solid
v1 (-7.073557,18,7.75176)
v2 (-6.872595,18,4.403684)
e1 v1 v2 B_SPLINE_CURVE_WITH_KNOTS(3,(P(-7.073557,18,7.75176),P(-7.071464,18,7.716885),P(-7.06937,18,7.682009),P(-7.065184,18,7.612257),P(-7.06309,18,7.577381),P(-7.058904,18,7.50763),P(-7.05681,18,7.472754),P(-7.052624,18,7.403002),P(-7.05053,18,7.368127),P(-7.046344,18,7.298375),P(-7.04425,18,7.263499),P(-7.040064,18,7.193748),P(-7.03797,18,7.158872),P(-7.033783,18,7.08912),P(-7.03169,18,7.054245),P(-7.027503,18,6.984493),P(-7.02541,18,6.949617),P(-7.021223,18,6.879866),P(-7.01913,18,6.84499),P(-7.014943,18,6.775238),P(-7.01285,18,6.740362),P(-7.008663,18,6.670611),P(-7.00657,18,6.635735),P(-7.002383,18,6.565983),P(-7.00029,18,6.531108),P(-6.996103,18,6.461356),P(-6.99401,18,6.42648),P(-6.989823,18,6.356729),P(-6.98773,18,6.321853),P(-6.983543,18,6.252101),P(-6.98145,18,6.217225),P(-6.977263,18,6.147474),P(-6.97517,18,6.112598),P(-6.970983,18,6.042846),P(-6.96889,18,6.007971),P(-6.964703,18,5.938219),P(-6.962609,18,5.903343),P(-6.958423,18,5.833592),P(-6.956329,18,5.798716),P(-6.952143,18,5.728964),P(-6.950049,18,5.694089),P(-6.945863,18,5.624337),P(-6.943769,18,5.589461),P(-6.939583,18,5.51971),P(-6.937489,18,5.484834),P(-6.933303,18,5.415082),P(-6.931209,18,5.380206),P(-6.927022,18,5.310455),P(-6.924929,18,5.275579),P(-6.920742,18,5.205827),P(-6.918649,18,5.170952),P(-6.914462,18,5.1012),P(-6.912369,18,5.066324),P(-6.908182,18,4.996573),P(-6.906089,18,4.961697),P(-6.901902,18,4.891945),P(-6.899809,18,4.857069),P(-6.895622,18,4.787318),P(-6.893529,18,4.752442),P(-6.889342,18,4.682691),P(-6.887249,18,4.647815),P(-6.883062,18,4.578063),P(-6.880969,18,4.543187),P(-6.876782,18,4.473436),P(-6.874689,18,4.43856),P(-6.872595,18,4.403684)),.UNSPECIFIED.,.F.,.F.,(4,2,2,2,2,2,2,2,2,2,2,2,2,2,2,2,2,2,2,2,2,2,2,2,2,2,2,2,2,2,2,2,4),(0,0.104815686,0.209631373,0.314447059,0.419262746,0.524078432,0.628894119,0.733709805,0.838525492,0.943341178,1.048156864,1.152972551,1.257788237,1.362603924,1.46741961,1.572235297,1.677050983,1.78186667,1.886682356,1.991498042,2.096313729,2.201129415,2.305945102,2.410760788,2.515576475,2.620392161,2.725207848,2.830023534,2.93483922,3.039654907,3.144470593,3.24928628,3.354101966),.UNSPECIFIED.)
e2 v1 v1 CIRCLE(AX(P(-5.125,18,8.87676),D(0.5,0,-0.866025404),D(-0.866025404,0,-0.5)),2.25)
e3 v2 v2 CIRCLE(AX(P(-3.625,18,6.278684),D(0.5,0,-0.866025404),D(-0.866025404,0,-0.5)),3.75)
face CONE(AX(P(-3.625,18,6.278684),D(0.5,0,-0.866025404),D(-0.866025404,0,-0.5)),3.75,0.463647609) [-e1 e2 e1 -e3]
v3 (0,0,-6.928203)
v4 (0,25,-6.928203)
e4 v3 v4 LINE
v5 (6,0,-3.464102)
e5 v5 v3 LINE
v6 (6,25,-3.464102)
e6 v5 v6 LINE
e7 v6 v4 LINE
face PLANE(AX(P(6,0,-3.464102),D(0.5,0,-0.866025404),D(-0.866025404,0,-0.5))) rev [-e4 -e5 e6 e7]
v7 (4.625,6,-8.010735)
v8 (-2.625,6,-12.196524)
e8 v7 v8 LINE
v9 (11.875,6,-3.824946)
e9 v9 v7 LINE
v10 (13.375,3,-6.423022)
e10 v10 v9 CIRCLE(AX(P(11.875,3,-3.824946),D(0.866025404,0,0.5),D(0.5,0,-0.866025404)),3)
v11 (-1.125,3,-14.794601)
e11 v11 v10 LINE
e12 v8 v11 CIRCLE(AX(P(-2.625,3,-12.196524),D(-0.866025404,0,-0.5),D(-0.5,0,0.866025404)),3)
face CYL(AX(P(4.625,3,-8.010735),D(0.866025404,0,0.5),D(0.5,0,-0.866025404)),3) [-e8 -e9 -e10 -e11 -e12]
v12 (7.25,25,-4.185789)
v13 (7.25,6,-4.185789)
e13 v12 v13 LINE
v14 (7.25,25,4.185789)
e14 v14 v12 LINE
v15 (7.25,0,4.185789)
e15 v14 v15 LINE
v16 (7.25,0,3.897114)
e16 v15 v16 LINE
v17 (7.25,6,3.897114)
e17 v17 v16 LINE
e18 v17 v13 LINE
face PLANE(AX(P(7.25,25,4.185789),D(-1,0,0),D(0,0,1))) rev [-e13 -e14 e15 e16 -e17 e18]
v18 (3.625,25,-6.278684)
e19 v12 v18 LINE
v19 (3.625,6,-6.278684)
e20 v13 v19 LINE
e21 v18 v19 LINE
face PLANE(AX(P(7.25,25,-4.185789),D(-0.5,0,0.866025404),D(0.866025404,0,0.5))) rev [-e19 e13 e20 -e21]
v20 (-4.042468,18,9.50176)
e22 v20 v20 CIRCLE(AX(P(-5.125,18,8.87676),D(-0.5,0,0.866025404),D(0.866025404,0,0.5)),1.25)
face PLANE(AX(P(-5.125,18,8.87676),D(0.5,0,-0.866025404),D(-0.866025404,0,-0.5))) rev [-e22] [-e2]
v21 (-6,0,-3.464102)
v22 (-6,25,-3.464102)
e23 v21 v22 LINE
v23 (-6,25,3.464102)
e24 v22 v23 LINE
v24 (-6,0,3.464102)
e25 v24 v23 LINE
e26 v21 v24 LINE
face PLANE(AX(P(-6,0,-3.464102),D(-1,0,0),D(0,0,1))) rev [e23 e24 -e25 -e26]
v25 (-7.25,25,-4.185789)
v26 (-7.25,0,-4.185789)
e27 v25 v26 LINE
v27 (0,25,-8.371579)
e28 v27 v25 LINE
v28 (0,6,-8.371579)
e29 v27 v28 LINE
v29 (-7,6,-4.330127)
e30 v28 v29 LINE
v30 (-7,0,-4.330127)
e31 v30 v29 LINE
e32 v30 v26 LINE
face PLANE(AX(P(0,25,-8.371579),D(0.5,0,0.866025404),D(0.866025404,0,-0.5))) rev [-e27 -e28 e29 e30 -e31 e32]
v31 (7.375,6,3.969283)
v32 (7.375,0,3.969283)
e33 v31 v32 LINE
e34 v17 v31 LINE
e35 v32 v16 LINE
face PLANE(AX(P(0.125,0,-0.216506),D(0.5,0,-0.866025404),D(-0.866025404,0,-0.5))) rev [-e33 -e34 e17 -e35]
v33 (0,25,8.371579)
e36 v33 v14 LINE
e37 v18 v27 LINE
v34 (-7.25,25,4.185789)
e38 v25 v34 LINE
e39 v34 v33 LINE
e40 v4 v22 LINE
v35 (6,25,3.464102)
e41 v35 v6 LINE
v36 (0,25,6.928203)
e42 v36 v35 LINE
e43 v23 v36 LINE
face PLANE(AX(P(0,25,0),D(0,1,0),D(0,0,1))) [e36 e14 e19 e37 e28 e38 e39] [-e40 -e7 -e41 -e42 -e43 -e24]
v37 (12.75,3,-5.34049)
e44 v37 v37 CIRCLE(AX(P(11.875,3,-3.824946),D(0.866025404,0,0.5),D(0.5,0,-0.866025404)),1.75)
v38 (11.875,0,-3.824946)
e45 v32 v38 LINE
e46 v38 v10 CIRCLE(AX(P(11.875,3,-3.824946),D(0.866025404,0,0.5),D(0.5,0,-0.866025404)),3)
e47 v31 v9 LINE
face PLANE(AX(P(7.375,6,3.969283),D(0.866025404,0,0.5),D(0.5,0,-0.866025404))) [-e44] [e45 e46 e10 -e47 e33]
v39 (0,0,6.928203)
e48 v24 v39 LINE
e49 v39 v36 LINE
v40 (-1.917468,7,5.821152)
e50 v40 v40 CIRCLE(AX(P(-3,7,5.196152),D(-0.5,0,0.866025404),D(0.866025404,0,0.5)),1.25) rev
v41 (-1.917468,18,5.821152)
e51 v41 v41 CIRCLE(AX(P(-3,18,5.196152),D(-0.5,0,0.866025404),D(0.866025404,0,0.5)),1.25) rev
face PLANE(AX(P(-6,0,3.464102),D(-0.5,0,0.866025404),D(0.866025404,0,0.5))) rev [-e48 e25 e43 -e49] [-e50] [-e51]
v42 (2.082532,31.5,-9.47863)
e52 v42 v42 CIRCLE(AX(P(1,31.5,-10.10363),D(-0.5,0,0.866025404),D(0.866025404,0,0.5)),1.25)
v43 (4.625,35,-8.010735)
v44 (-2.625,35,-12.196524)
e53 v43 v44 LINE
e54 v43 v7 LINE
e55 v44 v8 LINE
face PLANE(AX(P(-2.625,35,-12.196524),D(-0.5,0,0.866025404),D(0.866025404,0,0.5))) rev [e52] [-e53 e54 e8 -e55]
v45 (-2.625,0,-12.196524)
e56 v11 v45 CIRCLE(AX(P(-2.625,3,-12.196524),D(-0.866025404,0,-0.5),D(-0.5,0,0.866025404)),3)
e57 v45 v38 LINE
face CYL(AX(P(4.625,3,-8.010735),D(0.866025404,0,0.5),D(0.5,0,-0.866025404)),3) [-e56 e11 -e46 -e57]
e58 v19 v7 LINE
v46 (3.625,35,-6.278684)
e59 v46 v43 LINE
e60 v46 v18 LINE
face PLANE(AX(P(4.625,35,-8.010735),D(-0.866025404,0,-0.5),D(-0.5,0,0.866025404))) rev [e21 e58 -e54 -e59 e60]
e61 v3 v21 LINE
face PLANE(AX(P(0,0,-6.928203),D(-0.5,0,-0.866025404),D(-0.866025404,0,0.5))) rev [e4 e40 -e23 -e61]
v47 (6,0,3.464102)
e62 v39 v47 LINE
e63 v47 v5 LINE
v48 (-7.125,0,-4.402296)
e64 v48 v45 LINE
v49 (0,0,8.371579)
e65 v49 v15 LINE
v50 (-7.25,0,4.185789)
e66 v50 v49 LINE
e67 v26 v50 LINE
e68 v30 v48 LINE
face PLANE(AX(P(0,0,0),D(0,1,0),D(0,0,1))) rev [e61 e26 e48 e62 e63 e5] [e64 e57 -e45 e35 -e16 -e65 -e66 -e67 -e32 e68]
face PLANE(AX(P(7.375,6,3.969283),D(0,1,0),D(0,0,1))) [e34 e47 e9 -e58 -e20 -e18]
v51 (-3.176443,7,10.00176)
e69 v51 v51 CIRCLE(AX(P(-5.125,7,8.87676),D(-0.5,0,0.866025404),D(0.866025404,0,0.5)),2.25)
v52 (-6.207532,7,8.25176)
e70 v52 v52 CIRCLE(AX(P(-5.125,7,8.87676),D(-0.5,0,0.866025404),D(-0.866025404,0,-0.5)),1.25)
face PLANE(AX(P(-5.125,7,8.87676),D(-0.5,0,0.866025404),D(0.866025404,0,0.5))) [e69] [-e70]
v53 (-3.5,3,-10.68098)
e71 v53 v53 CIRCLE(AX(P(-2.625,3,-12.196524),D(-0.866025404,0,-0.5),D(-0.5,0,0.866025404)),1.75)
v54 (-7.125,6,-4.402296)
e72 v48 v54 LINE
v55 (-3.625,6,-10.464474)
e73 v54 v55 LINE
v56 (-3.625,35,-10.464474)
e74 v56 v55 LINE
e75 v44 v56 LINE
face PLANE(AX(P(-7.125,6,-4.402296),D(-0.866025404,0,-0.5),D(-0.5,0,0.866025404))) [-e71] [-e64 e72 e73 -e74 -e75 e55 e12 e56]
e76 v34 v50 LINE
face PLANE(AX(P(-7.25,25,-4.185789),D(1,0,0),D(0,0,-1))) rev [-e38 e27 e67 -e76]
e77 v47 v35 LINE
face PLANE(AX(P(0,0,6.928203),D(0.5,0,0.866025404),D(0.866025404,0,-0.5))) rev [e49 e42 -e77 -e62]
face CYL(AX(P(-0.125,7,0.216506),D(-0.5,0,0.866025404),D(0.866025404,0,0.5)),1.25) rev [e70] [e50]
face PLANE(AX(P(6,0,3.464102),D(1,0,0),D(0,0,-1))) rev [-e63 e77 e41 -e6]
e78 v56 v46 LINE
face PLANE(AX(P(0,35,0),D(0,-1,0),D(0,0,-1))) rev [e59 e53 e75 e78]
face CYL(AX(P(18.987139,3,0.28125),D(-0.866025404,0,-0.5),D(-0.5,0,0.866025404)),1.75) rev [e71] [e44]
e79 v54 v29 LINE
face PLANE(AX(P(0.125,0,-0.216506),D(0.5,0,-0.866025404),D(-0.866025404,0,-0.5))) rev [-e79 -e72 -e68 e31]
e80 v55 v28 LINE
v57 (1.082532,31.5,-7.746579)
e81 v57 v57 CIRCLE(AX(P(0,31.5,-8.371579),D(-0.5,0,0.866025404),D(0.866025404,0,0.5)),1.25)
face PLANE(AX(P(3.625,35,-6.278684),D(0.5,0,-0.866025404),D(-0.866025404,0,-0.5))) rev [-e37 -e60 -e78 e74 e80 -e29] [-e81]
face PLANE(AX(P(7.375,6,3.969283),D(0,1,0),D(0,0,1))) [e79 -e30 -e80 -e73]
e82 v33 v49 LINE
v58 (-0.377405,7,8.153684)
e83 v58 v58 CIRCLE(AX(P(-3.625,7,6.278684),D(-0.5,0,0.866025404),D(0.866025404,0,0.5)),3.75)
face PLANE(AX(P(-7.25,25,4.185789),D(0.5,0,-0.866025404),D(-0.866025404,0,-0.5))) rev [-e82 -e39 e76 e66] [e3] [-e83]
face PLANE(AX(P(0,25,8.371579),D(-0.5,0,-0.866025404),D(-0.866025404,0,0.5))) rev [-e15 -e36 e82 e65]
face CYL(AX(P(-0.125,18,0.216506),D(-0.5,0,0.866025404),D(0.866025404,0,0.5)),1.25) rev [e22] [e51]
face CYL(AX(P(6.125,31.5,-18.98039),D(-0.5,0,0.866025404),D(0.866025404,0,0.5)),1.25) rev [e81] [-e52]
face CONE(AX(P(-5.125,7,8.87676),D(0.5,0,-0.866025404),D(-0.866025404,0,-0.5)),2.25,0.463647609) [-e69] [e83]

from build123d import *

# Parameters (mm, degrees)
RESSALTO_EXTRUS_O1_DEPTH      = 25
ESBO_O3_R                     = 2.25
RESSALTO_EXTRUS_O2_DEPTH      = 3
ESBO_O6_R                     = 1.25
CORTE_EXTRUS_O2_DEPTH         = 10
RESSALTO_EXTRUS_O3_DEPTH      = 5
RESSALTO_EXTRUS_O3_DEPTH_BACK = 7
ESBO_O8_W                     = 16.743157806
ESBO_O8_H                     = 6
CORTE_EXTRUS_O1_DEPTH         = 32.980788504
FILETE2_R                     = 3
ESBO_O10_R                    = 1.75
CORTE_EXTRUS_O3_DEPTH         = 36.379050234
RESSALTO_EXTRUS_O4_DEPTH      = 29
ESBO_O12_R                    = 1.25
CORTE_EXTRUS_O4_DEPTH         = 41.103846452


with BuildPart() as part:
    # Esboço1 → Ressalto-extrusão1 (new body)
    with BuildSketch(Plane(origin=(0, 0, 0), x_dir=(1, 0, 0), z_dir=(0, 1, 0))):
        Polygon((7.25, 4.185789452), (0, 8.371578903), (-7.25, 4.185789452), (-7.25, -4.185789452), (0, -8.371578903), (7.25, -4.185789452), align=None)
    extrude(amount=RESSALTO_EXTRUS_O1_DEPTH)

    # Esboço3 → Ressalto-extrusão2 (add)
    with BuildSketch(Plane(origin=(-3.625, 0, 6.278684177), x_dir=(0.8660254037844387, 0, 0.4999999999999999), z_dir=(-0.49999999999999994, 0, 0.8660254037844388))):
        with Locations(Location((0, 7, 0), (0, 0, 180))):
            Circle(ESBO_O3_R)
        with Locations(Location((0, 18, 0), (0, 0, 180))):
            Circle(ESBO_O3_R)
    extrude(amount=RESSALTO_EXTRUS_O2_DEPTH)

    # Esboço4 → Revolução1 (revolve)
    with BuildSketch(Plane(origin=(0, 18, 0), x_dir=(1, 0, 0), z_dir=(0, 1, 0))):
        Polygon((-7.073557159, -7.751760389), (-6.872595264, -4.403684177), (-5.573557159, -5.153684177), align=None)
    revolve(axis=Axis((-2.565266445, 18, 4.443171818), (-0.5000000000000001, 0, 0.8660254037844386)))

    # Esboço5 → Revolução2 (revolve)
    with BuildSketch(Plane(origin=(0, 7, 0), x_dir=(-1, 0, 0), z_dir=(0, -1, 0)), mode=Mode.PRIVATE) as revolu_o2_sk:
        Polygon((7.073557159, -7.751760389), (5.573557159, -5.153684177), (6.872595264, -4.403684177), align=None)
    revolve(revolu_o2_sk.sketch.rotate(Axis((-5.573557159, 7, 9.653684177), (0.4999999999999998, 0, -0.8660254037844388)), 180), axis=Axis((-5.573557159, 7, 9.653684177), (0.4999999999999998, 0, -0.8660254037844388)))

    # Esboço6 → Corte-extrusão2 (cut)
    with BuildSketch(Plane(origin=(-5.125, 0, 8.876760389), x_dir=(0.8660254037844386, 0, 0.5), z_dir=(-0.5000000000000001, 0, 0.8660254037844387))):
        with Locations((0, 18)):
            Circle(ESBO_O6_R)
        with Locations(Location((0, 7, 0), (0, 0, 180))):
            Circle(ESBO_O6_R)
    extrude(amount=-CORTE_EXTRUS_O2_DEPTH, mode=Mode.SUBTRACT)

    # Esboço8 → Ressalto-extrusão3 (add, two sides: drawn at the far end of the back side and taken through both)
    with BuildSketch(Plane(origin=(3.625, 0, -6.278684177), x_dir=(-0.8660254037844386, 0, -0.4999999999999999), z_dir=(0.49999999999999994, 0, -0.8660254037844387)).offset(-RESSALTO_EXTRUS_O3_DEPTH_BACK)):
        with Locations((0, 3)):
            Rectangle(ESBO_O8_W, ESBO_O8_H)
    extrude(amount=RESSALTO_EXTRUS_O3_DEPTH + RESSALTO_EXTRUS_O3_DEPTH_BACK)

    # Esboço2 → Corte-extrusão1 (cut, through all)
    with BuildSketch(Plane(origin=(0, 25, 0), x_dir=(1, 0, 0), z_dir=(0, 1, 0))):
        Polygon((0, 6.92820323), (-6, 3.464101615), (-6, -3.464101615), (0, -6.92820323), (6, -3.464101615), (6, 3.464101615), align=None)
    extrude(amount=-CORTE_EXTRUS_O1_DEPTH, mode=Mode.SUBTRACT)

    # Filete2
    filete2_edges = [part.edges().sort_by_distance(p)[0] for p in [
        (6.125, 0, -10.608811196),
        (6.125, 6, -10.608811196),
    ]]
    fillet(filete2_edges, radius=FILETE2_R - 0.0001)  # a hair under: the kernel refuses the full size

    # Esboço10 → Corte-extrusão3 (cut, through all)
    with BuildSketch(Plane(origin=(-7.25, 0, -4.185789452), x_dir=(-0.5000000000000001, 0, 0.8660254037844386), z_dir=(-0.8660254037844386, 0, -0.5000000000000001))):
        with Locations((-9.25, 3)):
            Circle(ESBO_O10_R)
    extrude(amount=-CORTE_EXTRUS_O3_DEPTH, mode=Mode.SUBTRACT)

    # Esboço11 → Ressalto-extrusão4 (add)
    with BuildSketch(Plane(origin=(0, 6, 0), x_dir=(1, 0, 0), z_dir=(0, 1, 0))):
        Polygon((-2.625, 12.196524437), (4.625, 8.010734985), (3.625, 6.278684177), (-3.625, 10.464473629), align=None)
    extrude(amount=RESSALTO_EXTRUS_O4_DEPTH)

    # Esboço12 → Corte-extrusão4 (cut, through all)
    with BuildSketch(Plane(origin=(3.625, 0, -6.278684177), x_dir=(0.8660254037844386, 0, 0.4999999999999999), z_dir=(-0.49999999999999994, 0, 0.8660254037844387))):
        with Locations((-4.185789452, 31.5)):
            Circle(ESBO_O12_R)
    extrude(amount=-CORTE_EXTRUS_O4_DEPTH, mode=Mode.SUBTRACT)


solid = part.part
